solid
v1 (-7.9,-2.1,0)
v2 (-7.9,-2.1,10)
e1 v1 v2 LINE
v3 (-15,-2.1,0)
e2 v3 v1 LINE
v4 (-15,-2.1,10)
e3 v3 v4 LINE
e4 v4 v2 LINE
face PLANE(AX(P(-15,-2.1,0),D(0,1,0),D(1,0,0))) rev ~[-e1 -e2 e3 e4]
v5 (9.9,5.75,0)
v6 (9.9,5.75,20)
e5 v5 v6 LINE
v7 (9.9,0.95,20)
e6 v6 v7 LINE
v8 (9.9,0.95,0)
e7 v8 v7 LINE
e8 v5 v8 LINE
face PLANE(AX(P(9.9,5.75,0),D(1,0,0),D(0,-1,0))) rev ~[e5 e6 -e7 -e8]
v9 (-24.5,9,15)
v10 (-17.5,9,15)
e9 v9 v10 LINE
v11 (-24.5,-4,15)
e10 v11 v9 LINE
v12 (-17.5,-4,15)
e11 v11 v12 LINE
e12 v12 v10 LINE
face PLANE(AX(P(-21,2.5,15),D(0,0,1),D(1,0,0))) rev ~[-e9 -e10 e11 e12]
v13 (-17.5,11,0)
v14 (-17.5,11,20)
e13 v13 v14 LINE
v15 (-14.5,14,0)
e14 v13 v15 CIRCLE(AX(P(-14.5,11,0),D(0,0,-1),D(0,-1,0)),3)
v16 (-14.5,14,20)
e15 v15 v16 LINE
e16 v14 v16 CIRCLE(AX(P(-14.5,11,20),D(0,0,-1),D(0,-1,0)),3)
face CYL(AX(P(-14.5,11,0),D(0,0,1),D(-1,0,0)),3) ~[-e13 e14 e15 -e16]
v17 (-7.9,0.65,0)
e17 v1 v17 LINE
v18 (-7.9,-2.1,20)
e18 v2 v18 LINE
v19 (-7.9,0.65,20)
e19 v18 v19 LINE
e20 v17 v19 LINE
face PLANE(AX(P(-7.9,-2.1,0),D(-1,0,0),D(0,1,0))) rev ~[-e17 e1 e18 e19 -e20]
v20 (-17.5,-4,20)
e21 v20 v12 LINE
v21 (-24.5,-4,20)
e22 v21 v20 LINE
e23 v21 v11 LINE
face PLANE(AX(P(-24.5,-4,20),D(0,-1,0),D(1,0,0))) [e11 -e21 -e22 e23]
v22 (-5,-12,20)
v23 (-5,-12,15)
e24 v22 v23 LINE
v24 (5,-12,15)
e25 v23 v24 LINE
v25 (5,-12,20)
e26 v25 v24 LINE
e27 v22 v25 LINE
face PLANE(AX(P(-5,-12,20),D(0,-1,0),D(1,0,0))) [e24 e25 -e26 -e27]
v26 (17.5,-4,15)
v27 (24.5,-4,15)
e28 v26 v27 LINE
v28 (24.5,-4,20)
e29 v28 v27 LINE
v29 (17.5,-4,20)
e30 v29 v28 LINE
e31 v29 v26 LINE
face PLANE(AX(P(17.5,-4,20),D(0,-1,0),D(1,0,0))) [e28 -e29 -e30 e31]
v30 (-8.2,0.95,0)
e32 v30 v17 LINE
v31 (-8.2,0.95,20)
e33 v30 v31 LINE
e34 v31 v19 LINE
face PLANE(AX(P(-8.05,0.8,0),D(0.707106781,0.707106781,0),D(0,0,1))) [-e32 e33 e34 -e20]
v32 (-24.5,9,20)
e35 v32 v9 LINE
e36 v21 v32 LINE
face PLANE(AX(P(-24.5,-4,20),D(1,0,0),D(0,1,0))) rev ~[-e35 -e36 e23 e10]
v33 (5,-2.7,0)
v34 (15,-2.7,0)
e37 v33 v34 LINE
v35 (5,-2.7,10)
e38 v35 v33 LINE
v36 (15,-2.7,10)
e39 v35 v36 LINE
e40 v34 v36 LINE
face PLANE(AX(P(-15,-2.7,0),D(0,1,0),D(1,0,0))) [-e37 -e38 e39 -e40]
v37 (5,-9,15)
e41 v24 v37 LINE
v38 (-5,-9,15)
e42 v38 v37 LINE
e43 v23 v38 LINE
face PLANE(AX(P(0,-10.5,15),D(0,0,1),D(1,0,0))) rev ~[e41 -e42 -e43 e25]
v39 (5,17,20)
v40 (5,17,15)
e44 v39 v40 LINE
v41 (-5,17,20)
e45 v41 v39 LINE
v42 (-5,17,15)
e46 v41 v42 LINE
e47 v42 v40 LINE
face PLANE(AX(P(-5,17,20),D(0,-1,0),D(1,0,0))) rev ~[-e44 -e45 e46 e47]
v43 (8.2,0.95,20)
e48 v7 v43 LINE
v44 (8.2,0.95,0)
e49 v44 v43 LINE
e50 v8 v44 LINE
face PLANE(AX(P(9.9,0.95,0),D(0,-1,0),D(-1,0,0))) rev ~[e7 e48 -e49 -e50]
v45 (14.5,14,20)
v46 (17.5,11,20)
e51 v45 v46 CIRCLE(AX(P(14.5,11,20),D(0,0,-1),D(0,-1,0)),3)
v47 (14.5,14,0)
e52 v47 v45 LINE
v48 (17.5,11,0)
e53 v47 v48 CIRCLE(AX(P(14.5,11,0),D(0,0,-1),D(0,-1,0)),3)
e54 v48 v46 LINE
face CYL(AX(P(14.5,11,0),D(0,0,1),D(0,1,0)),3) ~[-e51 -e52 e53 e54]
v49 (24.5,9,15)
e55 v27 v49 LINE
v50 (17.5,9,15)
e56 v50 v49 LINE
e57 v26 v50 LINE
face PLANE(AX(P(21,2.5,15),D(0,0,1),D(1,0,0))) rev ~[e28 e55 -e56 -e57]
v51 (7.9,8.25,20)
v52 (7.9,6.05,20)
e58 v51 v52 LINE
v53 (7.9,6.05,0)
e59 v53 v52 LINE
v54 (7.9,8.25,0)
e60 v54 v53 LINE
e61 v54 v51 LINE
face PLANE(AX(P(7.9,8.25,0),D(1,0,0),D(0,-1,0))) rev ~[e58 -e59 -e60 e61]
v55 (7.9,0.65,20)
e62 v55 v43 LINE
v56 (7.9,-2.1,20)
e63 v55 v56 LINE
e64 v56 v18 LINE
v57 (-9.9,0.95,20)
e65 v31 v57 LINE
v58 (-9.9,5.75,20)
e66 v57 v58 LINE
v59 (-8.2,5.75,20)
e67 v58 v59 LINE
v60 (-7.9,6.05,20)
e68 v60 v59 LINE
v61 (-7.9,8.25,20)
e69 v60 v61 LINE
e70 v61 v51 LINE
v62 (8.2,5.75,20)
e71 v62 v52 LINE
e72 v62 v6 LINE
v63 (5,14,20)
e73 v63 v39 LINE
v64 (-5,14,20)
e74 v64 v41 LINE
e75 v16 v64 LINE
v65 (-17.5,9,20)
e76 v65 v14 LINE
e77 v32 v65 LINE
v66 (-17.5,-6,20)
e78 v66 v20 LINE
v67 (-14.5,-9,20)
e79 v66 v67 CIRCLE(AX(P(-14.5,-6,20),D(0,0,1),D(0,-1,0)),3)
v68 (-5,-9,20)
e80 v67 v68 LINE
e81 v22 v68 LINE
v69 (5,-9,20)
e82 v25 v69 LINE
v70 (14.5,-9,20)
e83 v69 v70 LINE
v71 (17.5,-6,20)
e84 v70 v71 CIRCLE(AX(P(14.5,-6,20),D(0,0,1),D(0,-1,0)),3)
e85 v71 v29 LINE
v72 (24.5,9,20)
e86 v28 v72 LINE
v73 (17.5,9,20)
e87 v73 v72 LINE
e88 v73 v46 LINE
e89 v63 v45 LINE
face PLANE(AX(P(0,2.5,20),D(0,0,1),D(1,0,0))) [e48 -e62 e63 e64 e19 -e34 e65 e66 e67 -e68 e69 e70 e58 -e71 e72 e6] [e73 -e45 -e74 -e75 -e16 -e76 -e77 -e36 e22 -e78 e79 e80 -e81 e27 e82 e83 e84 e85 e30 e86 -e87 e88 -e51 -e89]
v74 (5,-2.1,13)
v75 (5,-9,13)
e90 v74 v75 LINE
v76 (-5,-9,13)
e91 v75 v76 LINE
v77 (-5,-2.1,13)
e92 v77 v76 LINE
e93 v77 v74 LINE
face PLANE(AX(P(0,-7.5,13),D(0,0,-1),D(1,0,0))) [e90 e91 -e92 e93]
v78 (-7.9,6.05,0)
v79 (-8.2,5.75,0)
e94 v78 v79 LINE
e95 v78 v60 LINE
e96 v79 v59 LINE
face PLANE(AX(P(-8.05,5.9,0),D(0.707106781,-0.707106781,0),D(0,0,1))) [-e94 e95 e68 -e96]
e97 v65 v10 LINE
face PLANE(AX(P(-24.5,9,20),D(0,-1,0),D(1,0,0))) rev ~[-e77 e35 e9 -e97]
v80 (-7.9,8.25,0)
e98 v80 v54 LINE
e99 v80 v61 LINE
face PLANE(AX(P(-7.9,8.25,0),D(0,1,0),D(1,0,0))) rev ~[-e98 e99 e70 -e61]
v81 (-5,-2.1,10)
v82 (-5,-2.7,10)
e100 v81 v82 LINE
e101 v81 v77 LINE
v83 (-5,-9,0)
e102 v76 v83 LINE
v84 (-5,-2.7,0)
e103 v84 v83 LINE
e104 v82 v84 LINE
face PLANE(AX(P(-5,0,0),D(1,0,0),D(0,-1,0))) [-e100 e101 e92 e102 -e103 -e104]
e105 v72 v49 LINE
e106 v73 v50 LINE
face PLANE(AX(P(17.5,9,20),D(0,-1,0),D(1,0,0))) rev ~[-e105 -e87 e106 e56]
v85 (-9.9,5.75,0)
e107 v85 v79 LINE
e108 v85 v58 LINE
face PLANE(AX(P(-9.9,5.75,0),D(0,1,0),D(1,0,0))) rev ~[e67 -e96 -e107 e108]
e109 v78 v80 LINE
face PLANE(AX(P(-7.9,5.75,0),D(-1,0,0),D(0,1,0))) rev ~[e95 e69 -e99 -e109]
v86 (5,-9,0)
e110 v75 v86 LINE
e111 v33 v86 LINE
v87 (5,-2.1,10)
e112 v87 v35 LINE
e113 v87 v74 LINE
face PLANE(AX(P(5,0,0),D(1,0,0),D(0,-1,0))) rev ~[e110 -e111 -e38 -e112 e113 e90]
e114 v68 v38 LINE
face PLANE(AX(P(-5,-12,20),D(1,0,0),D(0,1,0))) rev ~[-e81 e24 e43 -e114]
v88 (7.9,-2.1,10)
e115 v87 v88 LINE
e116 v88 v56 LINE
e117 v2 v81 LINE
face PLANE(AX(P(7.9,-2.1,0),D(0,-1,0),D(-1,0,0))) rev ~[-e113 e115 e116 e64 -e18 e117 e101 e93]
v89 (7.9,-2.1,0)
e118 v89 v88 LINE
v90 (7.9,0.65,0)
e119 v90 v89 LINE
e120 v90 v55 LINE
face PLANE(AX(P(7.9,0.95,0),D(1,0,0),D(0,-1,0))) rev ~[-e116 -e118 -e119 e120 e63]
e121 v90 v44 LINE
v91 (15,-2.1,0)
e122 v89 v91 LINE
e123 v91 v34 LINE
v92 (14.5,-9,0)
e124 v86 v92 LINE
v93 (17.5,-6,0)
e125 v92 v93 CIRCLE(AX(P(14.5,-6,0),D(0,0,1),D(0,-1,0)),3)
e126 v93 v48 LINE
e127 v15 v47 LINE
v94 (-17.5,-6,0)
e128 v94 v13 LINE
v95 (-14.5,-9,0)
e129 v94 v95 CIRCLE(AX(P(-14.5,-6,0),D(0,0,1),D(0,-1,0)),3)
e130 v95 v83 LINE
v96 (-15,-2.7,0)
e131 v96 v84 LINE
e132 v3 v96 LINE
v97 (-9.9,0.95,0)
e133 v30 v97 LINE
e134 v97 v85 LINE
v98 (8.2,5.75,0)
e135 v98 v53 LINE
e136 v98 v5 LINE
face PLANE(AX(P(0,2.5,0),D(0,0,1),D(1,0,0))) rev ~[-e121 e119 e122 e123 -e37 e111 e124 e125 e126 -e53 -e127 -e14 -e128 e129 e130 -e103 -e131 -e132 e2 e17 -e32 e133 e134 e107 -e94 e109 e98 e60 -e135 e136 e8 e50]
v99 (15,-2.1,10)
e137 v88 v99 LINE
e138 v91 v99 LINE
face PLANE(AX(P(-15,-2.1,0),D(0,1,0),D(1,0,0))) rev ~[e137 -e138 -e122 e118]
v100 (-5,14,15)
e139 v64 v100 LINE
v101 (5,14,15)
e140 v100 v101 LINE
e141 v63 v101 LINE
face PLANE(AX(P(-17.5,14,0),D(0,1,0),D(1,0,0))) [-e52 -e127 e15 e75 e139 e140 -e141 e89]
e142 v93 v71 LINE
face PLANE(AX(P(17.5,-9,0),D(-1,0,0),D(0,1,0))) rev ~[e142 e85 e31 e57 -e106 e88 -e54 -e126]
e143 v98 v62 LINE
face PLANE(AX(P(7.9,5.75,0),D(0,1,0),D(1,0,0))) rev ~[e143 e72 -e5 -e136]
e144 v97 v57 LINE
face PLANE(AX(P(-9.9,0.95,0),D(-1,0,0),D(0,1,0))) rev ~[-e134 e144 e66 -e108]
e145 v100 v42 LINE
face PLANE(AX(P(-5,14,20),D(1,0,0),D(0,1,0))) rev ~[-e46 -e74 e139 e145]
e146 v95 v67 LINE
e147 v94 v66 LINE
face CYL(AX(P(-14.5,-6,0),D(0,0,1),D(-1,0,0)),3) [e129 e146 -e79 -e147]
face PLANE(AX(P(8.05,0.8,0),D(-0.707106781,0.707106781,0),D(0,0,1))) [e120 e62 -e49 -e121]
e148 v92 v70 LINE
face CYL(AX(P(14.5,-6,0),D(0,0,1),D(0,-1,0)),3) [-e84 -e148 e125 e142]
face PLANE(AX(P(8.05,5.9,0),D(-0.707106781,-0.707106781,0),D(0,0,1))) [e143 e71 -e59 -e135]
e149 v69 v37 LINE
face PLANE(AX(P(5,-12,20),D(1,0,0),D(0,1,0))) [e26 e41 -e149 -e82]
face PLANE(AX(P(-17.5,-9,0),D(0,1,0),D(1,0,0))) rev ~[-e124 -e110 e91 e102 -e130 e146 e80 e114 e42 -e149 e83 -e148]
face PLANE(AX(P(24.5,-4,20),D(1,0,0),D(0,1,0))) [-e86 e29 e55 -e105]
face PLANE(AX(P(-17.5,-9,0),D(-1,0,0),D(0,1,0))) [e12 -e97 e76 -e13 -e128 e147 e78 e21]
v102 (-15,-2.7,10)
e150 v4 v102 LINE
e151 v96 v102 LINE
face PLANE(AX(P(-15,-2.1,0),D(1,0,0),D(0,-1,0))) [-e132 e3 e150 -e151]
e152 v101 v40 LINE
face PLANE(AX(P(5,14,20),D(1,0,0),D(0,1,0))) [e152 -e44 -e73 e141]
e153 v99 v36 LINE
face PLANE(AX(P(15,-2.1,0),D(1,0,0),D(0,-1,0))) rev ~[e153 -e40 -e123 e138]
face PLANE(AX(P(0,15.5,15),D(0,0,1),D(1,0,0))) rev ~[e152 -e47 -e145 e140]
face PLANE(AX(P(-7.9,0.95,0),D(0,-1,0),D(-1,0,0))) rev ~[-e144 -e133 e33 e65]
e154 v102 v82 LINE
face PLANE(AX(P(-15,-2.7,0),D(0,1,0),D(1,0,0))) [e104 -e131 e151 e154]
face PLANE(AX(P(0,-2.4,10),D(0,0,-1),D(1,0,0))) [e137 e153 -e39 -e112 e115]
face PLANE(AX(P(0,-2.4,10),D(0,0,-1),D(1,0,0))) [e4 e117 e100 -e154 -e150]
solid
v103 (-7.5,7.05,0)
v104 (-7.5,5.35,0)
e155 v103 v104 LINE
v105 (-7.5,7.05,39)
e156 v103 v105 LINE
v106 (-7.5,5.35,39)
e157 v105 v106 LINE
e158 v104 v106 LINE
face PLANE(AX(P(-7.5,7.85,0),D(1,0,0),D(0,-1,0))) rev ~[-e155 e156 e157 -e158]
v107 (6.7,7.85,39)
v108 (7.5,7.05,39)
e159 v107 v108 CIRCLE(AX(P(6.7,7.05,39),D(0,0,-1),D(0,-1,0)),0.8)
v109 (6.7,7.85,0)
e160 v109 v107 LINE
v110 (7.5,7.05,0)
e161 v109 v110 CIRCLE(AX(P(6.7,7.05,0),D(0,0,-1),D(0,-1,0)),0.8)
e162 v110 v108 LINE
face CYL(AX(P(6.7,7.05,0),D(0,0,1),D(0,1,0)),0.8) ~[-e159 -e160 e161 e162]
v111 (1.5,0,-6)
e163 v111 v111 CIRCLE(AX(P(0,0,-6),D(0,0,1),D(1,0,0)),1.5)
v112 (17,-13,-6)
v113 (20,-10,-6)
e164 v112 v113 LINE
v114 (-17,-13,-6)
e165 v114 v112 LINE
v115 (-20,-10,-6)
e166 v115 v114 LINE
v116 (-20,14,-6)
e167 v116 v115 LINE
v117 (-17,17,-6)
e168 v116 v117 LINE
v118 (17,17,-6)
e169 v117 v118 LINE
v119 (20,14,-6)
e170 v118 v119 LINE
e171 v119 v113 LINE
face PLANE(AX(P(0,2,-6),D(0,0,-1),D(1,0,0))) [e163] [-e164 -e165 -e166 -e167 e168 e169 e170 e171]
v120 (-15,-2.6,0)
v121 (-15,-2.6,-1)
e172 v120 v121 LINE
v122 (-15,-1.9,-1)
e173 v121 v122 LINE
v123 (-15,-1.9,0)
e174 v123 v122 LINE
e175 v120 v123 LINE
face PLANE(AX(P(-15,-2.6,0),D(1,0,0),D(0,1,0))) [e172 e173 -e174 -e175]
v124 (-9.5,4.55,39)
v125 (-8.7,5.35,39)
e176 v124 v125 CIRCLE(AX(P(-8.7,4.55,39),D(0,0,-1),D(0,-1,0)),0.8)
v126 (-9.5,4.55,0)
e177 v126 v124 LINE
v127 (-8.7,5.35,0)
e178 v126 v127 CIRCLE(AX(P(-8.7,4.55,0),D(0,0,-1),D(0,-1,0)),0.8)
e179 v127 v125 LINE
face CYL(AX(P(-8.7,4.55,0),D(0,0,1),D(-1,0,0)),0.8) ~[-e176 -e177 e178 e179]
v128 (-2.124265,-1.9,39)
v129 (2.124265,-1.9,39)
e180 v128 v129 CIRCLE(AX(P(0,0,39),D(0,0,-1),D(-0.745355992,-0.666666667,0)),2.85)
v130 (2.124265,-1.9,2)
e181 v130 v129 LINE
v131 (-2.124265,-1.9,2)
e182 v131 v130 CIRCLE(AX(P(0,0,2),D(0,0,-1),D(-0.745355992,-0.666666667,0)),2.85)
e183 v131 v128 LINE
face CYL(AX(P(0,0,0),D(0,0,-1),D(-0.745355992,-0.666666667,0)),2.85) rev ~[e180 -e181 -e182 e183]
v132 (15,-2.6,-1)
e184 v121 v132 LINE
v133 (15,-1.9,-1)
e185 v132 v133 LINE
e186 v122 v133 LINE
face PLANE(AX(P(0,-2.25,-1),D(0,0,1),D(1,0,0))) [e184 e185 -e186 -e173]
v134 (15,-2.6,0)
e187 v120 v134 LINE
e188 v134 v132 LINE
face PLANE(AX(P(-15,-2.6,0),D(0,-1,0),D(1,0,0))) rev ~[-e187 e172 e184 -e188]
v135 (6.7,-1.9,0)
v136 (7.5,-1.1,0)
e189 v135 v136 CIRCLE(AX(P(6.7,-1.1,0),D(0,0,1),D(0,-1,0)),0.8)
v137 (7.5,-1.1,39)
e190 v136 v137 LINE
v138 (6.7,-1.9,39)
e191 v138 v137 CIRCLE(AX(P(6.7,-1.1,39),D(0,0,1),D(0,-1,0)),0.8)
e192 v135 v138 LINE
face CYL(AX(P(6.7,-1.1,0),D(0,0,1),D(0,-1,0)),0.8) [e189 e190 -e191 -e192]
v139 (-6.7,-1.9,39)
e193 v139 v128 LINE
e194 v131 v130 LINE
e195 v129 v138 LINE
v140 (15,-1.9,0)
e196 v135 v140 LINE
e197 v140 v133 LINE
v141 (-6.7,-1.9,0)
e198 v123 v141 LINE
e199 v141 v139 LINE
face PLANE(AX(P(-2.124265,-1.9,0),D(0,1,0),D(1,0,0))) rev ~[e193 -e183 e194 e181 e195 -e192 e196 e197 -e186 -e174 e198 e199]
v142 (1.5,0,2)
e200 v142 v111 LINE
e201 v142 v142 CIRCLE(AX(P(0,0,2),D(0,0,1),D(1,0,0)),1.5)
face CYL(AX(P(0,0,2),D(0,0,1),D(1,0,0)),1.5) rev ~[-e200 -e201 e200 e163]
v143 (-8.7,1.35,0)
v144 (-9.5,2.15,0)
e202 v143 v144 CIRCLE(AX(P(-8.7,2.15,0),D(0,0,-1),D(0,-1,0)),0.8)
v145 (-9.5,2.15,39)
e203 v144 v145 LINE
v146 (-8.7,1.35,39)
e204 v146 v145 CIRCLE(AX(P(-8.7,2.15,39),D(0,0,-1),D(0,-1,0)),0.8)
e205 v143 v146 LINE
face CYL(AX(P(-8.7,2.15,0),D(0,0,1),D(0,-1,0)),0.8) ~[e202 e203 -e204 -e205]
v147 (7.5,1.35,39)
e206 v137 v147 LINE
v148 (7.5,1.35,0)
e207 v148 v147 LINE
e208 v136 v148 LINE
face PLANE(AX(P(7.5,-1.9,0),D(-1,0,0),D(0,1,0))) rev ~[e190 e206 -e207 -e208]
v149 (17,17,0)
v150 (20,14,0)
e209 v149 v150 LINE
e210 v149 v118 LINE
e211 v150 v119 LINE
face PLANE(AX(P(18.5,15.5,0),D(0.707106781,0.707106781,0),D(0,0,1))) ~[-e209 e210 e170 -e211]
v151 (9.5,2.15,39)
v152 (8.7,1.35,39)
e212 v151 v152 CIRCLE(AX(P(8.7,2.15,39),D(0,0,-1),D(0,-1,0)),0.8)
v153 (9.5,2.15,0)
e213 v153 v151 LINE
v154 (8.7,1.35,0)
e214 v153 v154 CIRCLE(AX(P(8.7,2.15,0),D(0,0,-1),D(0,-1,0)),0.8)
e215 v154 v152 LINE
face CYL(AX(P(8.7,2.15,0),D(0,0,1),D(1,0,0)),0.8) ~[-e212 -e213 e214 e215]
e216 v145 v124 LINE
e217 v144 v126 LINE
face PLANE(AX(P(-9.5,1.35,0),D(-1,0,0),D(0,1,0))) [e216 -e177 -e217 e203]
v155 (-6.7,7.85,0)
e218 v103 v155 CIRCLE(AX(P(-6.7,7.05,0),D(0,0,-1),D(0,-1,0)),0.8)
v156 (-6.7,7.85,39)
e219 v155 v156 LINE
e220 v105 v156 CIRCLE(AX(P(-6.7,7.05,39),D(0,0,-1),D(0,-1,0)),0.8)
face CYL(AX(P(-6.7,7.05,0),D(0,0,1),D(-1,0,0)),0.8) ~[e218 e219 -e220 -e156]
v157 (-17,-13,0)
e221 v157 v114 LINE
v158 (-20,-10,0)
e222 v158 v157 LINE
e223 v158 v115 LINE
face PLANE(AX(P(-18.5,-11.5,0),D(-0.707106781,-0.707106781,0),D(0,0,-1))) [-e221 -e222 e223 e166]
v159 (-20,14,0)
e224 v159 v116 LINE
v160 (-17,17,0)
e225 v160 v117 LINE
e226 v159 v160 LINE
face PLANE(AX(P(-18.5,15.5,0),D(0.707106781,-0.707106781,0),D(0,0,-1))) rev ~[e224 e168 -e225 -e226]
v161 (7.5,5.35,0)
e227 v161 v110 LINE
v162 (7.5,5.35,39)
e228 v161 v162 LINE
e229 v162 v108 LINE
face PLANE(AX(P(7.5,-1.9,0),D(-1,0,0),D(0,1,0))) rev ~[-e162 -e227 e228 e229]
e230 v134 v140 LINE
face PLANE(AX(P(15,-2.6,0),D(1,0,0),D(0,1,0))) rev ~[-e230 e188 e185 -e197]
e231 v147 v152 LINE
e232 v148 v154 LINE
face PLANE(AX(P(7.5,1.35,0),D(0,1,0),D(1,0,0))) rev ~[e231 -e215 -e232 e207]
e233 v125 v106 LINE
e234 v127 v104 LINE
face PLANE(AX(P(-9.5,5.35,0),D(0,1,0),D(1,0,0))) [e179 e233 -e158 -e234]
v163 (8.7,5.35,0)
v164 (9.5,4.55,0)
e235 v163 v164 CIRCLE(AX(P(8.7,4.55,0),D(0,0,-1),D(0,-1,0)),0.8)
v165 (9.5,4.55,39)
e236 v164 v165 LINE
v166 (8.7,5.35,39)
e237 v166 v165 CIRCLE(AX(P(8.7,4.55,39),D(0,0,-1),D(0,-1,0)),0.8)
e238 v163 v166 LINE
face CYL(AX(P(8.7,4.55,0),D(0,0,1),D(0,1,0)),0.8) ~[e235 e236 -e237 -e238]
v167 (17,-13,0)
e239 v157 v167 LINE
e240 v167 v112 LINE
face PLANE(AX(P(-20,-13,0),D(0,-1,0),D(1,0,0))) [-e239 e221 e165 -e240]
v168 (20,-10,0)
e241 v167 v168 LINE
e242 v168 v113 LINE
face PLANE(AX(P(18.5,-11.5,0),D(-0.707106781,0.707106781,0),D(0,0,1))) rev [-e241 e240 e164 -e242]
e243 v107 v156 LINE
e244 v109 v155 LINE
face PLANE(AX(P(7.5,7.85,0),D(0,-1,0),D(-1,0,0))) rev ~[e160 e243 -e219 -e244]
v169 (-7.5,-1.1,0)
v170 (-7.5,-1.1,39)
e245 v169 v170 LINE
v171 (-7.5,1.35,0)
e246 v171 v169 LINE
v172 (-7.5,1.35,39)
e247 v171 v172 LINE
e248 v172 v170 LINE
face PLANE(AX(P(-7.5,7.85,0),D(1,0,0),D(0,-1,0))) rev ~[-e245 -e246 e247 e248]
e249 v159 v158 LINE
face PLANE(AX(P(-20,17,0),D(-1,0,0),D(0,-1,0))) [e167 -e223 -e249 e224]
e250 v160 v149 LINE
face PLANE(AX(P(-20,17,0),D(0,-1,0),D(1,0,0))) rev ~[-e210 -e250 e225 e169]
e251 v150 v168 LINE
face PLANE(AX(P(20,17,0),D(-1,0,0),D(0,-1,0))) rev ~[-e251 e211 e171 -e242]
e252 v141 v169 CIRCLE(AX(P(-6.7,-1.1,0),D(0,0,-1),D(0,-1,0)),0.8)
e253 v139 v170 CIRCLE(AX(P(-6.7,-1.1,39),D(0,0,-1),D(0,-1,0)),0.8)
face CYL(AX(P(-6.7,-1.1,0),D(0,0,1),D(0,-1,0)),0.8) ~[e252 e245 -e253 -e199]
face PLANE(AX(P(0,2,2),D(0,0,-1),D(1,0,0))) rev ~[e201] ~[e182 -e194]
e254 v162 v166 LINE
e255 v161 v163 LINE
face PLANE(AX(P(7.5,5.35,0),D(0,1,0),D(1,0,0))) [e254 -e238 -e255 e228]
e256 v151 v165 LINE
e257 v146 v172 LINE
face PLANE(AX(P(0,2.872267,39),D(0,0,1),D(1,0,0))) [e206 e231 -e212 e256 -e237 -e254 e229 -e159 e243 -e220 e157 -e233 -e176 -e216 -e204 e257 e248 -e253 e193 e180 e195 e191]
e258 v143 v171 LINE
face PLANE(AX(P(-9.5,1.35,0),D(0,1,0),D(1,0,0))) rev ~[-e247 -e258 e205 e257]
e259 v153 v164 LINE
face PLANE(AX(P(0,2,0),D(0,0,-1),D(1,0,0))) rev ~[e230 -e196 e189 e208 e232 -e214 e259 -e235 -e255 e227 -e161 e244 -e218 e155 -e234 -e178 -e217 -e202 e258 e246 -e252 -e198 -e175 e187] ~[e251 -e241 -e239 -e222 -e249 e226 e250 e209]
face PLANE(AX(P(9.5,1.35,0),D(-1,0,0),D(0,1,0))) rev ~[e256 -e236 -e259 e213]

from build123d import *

# Parameters (mm, degrees)
F1_DEPTH  = 39
F2_W      = 40
F2_H      = 30
F3_DEPTH  = 6
F4_W      = 2
F4_H      = 4
F5_DEPTH  = 39
F6_R      = 0.8
F7_W      = 35
F7_H      = 23
F8_DEPTH  = 20
F9_R      = 3
F10_W     = 10
F10_H     = 3
F11_DEPTH = 5
F12_SIZE  = 3
F13_W     = 30
F13_H     = 0.6
F14_DEPTH = 10
F15_W     = 10
F15_H     = 15
F16_DEPTH = 13
F17_W     = 30
F17_H     = 0.7
F18_DEPTH = 1
F19_DEPTH = 2
F20_R     = 1.5
F21_DEPTH = 25
F22_W     = 7
F22_H     = 13
F23_DEPTH = 5
F24_SIZE  = 0.3


with BuildPart() as f1:
    # F0 (on Top) → F1 (new body)
    with BuildSketch(Plane.XY):
        with BuildLine():
            Line((7.5, 7.85), (-7.5, 7.85))
            Line((-7.5, 7.85), (-7.5, -1.9))
            Line((-7.5, -1.9), (-2.1242645786, -1.9))
            ThreePointArc((-2.1242645786, -1.9), (0, 2.85), (2.1242645786, -1.9))
            Line((2.1242645786, -1.9), (7.5, -1.9))
            Line((7.5, -1.9), (7.5, 7.85))
        make_face()
    extrude(amount=F1_DEPTH)

    # F2 (on face) → F3 (join)
    with BuildSketch(Plane(origin=(0, 0, 0), x_dir=(1, 0, 0), z_dir=(0, 0, -1))):
        with Locations((0, -2)):
            Rectangle(F2_W, F2_H)
    extrude(amount=F3_DEPTH)

    # F4 (on face) → F5 (join, through all)
    with BuildSketch(Plane.XY):
        with Locations((-8.5, 3.35)):
            Rectangle(F4_W, F4_H)
        with Locations((8.5, 3.35)):
            Rectangle(F4_W, F4_H)
    extrude(amount=F5_DEPTH)

    # F6
    f6_edges = [f1.edges().sort_by_distance(p)[0] for p in [
        (-7.5, -1.9, 19.5),
        (7.5, -1.9, 19.5),
        (7.5, 7.85, 19.5),
        (-7.5, 7.85, 19.5),
        (-9.5, 5.35, 19.5),
        (-9.5, 1.35, 19.5),
        (9.5, 1.35, 19.5),
        (9.5, 5.35, 19.5),
    ]]
    fillet(f6_edges, radius=F6_R)

    # F12
    f12_edges = [f1.edges().sort_by_distance(p)[0] for p in [
        (-20, -13, -3),
        (20, -13, -3),
        (20, 17, -3),
        (-20, 17, -3),
    ]]
    chamfer(f12_edges, length=F12_SIZE)

    # F17 (on face) → F18 (cut)
    with BuildSketch(Plane.XY):
        with Locations((0, -2.25)):
            Rectangle(F17_W, F17_H)
    extrude(amount=-F18_DEPTH, mode=Mode.SUBTRACT)

    # F19 (add): a face of the model
    f19_faces = [f1.faces().sort_by_distance(p)[0] for p in [
        (0, 0.2812457246, 0),
    ]]
    extrude(f19_faces, amount=F19_DEPTH)

    # F20 (on face) → F21 (cut)
    with BuildSketch(Plane.XY.offset(2)):
        Circle(F20_R)
    extrude(amount=-F21_DEPTH, mode=Mode.SUBTRACT)


with BuildPart() as f8:
    # F7 (on face) → F8 (new body)
    with BuildSketch(Plane.XY):
        with Locations((0, 2.5)):
            Rectangle(F7_W, F7_H)
        Polygon((-7.9, 5.75), (-7.9, 8.25), (7.9, 8.25), (7.9, 5.75), (9.9, 5.75), (9.9, 0.95), (7.9, 0.95), (7.9, -2.1), (-7.9, -2.1), (-7.9, 0.95), (-9.9, 0.95), (-9.9, 5.75), align=None, mode=Mode.SUBTRACT)
    extrude(amount=F8_DEPTH)

    # F9
    f9_edges = [f8.edges().sort_by_distance(p)[0] for p in [
        (17.5, 14, 10),
        (-17.5, 14, 10),
        (-17.5, -9, 10),
        (17.5, -9, 10),
    ]]
    fillet(f9_edges, radius=F9_R)

    # F10 (on face) → F11 (join)
    with BuildSketch(Plane.XY.offset(20)):
        with Locations((0, 15.5)):
            Rectangle(F10_W, F10_H)
        with Locations((0, -10.5)):
            Rectangle(F10_W, F10_H)
    extrude(amount=-F11_DEPTH)

    # F13 (on face) → F14 (cut)
    with BuildSketch(Plane(origin=(0, 0, 0), x_dir=(1, 0, 0), z_dir=(0, 0, -1))):
        with Locations((0, 2.4)):
            Rectangle(F13_W, F13_H)
    extrude(amount=-F14_DEPTH, mode=Mode.SUBTRACT)

    # F15 (on face) → F16 (cut)
    with BuildSketch(Plane(origin=(0, 0, 0), x_dir=(1, 0, 0), z_dir=(0, 0, -1))):
        with Locations((0, 7.5)):
            Rectangle(F15_W, F15_H)
    extrude(amount=-F16_DEPTH, mode=Mode.SUBTRACT)

    # F22 (on face) → F23 (join)
    with BuildSketch(Plane.XY.offset(20)):
        with Locations((-21, 2.5)):
            Rectangle(F22_W, F22_H)
        with Locations((21, 2.5)):
            Rectangle(F22_W, F22_H)
    extrude(amount=-F23_DEPTH)

    # F24
    f24_edges = [f8.edges().sort_by_distance(p)[0] for p in [
        (-7.9, 5.75, 10),
        (7.9, 5.75, 10),
        (-7.9, 0.95, 10),
        (7.9, 0.95, 10),
    ]]
    chamfer(f24_edges, length=F24_SIZE)


solid = Compound([f1.part, f8.part])
